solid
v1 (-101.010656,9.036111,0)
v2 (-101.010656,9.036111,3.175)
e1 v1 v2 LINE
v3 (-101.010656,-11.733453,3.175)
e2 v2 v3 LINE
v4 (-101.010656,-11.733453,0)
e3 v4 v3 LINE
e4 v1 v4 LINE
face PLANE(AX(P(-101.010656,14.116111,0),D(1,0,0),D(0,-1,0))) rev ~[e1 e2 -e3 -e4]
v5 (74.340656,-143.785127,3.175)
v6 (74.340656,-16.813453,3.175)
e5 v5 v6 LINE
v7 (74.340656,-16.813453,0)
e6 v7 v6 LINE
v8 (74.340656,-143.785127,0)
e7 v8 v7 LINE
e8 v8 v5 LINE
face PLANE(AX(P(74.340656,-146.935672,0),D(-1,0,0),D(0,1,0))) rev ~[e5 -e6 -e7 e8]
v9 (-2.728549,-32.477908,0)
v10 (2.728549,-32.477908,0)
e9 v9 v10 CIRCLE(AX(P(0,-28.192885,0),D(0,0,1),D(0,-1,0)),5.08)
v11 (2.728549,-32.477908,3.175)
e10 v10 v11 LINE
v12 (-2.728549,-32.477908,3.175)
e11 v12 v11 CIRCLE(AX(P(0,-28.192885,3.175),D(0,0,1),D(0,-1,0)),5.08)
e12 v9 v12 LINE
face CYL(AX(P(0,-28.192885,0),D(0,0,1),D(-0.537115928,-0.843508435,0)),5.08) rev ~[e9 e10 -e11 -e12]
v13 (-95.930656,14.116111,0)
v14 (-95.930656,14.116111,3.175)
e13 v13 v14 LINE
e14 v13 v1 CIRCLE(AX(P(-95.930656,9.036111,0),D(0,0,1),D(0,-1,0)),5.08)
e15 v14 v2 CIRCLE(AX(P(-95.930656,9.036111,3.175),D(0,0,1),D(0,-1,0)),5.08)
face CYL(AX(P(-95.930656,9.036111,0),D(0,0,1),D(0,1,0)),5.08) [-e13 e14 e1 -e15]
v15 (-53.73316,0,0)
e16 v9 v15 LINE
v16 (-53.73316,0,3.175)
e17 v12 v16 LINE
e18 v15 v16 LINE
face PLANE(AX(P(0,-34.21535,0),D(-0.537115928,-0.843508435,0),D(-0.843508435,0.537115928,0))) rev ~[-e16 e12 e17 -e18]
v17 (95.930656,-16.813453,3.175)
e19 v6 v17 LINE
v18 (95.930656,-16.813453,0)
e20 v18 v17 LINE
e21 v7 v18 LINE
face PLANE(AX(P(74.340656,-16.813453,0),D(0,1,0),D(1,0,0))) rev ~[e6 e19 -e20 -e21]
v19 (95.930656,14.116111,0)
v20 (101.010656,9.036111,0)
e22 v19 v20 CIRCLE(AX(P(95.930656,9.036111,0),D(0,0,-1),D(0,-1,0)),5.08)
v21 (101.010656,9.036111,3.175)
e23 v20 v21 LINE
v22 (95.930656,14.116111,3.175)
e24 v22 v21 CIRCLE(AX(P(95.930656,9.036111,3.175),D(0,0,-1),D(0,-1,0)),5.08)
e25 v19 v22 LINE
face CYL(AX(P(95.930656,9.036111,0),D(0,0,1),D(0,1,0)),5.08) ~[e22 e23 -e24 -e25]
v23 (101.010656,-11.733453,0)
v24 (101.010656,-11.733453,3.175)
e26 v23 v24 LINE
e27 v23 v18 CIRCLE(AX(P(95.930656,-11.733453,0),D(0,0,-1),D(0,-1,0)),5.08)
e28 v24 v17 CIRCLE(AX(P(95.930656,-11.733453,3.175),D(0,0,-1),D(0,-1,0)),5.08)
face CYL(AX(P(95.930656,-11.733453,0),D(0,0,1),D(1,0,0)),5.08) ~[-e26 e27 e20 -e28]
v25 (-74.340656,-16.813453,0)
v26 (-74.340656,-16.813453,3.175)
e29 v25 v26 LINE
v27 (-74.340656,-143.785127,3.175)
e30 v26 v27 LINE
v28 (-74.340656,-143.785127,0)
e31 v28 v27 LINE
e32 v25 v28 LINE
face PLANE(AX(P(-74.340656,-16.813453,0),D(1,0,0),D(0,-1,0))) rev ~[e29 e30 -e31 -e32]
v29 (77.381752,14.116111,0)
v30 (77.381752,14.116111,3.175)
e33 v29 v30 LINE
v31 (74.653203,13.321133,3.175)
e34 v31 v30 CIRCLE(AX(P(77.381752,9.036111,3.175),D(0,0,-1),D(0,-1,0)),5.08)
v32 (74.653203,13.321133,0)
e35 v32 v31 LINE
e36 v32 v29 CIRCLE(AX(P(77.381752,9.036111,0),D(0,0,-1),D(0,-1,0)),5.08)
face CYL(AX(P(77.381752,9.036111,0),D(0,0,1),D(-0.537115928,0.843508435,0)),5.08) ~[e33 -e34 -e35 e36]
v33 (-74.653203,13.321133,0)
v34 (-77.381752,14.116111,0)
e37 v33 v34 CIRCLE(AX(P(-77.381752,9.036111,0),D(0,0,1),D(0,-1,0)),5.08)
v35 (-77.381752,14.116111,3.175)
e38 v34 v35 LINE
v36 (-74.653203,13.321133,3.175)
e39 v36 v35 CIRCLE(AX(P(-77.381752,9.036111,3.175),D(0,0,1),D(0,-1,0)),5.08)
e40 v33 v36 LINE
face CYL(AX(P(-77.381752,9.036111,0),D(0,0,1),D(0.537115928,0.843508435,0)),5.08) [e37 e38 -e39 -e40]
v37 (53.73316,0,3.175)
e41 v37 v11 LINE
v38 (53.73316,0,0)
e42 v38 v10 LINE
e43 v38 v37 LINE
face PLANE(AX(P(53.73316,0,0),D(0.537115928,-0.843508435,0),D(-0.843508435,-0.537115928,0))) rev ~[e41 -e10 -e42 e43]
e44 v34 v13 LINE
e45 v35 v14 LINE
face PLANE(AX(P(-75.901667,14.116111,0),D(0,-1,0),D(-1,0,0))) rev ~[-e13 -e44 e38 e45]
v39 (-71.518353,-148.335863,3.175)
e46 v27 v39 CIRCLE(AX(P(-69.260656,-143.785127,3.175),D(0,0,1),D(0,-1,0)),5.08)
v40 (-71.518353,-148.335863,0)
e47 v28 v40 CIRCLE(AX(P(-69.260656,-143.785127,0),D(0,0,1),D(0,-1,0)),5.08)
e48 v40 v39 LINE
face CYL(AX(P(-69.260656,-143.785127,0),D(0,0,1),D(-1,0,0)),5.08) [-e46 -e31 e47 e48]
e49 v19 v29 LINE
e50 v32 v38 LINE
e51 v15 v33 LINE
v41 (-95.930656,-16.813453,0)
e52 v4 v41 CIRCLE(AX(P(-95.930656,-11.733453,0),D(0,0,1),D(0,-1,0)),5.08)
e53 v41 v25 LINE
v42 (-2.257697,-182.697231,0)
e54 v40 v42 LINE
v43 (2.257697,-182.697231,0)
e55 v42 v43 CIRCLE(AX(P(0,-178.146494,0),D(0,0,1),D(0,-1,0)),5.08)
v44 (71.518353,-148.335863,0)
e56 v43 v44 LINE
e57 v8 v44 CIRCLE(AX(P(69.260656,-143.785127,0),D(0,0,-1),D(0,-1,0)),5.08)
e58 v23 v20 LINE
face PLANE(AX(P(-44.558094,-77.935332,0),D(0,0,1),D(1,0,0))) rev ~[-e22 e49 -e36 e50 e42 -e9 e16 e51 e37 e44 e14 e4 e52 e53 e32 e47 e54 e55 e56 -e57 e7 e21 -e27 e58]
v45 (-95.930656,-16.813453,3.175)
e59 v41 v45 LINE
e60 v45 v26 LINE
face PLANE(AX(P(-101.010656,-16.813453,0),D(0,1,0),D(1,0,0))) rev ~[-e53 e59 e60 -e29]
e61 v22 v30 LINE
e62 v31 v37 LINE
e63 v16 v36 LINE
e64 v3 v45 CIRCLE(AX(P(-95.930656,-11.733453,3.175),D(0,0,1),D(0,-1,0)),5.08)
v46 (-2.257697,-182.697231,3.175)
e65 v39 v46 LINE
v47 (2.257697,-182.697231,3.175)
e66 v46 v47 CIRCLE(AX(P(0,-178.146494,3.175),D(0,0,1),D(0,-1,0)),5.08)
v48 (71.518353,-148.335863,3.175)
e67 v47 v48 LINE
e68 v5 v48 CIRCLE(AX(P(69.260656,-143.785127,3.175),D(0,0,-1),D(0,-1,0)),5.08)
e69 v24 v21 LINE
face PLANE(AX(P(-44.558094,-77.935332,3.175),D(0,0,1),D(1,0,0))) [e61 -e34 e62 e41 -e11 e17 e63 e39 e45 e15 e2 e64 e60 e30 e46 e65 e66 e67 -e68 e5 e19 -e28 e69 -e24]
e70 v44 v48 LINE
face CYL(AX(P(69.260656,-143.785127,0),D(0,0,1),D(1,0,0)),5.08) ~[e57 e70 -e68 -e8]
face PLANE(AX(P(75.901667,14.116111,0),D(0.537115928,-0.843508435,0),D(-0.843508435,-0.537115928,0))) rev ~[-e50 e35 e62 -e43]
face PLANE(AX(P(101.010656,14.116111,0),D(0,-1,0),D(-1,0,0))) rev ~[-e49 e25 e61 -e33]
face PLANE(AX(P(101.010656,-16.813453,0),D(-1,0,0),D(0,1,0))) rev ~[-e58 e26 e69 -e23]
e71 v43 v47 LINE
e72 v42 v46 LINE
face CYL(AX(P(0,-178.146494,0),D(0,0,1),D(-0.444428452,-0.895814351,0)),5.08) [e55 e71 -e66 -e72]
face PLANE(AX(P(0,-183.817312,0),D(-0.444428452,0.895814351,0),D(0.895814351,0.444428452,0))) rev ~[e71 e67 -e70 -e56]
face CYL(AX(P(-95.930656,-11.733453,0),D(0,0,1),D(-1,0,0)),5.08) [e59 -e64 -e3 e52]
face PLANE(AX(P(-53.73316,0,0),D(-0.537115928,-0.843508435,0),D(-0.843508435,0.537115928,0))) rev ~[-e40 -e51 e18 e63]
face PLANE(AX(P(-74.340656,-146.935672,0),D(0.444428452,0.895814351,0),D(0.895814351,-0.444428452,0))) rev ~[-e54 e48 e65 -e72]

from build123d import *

# Parameters (mm, degrees)
F1_DEPTH = 3.175
F2_R     = 5.08
F3_R     = 5.08


# Not quite as in the source:
# - two fillets or chamfers of one size are made in one step


with BuildPart() as f1:
    # F0 (on Top) → F1 (new body)
    with BuildSketch(Plane.XY):
        Polygon((0, -34.215349704), (-53.7331599414, 0), (-75.9016672165, 14.1161106039), (-101.0106563997, 14.1161106039), (-101.0106563997, 7.5655808932), (-101.0106563997, 0), (-101.0106563997, -16.8134532869), (-74.3406563997, -16.8134532869), (-74.3406563997, -43.2344191068), (-74.3406563997, -119.4344191068), (-74.3406563997, -146.9356715679), (0, -183.8173121214), align=None)
        Polygon((53.7331599414, 0), (0, -34.215349704), (0, -183.8173121214), (74.3406563997, -146.9356715679), (74.3406563997, -119.4344191068), (74.3406563997, -43.2344191068), (74.3406563997, -16.8134532869), (101.0106563997, -16.8134532869), (101.0106563997, 14.1161106039), (75.9016672165, 14.1161106039), align=None)
    extrude(amount=F1_DEPTH)

    # F2
    f2_edges = [f1.edges().sort_by_distance(p)[0] for p in [
        (0, -34.21535, 1.5875),
    ]]
    fillet(f2_edges, radius=F2_R)

    # F3
    f3_edges = [f1.edges().sort_by_distance(p)[0] for p in [
        (-74.340656, -146.935672, 1.5875),
        (0, -183.817312, 1.5875),
        (74.340656, -146.935672, 1.5875),
        (-75.901667, 14.116111, 1.5875),
        (-101.010656, 14.116111, 1.5875),
        (75.901667, 14.116111, 1.5875),
        (-101.010656, -16.813453, 1.5875),
        (101.010656, 14.116111, 1.5875),
        (101.010656, -16.813453, 1.5875),
    ]]
    fillet(f3_edges, radius=F3_R)


solid = f1.part
